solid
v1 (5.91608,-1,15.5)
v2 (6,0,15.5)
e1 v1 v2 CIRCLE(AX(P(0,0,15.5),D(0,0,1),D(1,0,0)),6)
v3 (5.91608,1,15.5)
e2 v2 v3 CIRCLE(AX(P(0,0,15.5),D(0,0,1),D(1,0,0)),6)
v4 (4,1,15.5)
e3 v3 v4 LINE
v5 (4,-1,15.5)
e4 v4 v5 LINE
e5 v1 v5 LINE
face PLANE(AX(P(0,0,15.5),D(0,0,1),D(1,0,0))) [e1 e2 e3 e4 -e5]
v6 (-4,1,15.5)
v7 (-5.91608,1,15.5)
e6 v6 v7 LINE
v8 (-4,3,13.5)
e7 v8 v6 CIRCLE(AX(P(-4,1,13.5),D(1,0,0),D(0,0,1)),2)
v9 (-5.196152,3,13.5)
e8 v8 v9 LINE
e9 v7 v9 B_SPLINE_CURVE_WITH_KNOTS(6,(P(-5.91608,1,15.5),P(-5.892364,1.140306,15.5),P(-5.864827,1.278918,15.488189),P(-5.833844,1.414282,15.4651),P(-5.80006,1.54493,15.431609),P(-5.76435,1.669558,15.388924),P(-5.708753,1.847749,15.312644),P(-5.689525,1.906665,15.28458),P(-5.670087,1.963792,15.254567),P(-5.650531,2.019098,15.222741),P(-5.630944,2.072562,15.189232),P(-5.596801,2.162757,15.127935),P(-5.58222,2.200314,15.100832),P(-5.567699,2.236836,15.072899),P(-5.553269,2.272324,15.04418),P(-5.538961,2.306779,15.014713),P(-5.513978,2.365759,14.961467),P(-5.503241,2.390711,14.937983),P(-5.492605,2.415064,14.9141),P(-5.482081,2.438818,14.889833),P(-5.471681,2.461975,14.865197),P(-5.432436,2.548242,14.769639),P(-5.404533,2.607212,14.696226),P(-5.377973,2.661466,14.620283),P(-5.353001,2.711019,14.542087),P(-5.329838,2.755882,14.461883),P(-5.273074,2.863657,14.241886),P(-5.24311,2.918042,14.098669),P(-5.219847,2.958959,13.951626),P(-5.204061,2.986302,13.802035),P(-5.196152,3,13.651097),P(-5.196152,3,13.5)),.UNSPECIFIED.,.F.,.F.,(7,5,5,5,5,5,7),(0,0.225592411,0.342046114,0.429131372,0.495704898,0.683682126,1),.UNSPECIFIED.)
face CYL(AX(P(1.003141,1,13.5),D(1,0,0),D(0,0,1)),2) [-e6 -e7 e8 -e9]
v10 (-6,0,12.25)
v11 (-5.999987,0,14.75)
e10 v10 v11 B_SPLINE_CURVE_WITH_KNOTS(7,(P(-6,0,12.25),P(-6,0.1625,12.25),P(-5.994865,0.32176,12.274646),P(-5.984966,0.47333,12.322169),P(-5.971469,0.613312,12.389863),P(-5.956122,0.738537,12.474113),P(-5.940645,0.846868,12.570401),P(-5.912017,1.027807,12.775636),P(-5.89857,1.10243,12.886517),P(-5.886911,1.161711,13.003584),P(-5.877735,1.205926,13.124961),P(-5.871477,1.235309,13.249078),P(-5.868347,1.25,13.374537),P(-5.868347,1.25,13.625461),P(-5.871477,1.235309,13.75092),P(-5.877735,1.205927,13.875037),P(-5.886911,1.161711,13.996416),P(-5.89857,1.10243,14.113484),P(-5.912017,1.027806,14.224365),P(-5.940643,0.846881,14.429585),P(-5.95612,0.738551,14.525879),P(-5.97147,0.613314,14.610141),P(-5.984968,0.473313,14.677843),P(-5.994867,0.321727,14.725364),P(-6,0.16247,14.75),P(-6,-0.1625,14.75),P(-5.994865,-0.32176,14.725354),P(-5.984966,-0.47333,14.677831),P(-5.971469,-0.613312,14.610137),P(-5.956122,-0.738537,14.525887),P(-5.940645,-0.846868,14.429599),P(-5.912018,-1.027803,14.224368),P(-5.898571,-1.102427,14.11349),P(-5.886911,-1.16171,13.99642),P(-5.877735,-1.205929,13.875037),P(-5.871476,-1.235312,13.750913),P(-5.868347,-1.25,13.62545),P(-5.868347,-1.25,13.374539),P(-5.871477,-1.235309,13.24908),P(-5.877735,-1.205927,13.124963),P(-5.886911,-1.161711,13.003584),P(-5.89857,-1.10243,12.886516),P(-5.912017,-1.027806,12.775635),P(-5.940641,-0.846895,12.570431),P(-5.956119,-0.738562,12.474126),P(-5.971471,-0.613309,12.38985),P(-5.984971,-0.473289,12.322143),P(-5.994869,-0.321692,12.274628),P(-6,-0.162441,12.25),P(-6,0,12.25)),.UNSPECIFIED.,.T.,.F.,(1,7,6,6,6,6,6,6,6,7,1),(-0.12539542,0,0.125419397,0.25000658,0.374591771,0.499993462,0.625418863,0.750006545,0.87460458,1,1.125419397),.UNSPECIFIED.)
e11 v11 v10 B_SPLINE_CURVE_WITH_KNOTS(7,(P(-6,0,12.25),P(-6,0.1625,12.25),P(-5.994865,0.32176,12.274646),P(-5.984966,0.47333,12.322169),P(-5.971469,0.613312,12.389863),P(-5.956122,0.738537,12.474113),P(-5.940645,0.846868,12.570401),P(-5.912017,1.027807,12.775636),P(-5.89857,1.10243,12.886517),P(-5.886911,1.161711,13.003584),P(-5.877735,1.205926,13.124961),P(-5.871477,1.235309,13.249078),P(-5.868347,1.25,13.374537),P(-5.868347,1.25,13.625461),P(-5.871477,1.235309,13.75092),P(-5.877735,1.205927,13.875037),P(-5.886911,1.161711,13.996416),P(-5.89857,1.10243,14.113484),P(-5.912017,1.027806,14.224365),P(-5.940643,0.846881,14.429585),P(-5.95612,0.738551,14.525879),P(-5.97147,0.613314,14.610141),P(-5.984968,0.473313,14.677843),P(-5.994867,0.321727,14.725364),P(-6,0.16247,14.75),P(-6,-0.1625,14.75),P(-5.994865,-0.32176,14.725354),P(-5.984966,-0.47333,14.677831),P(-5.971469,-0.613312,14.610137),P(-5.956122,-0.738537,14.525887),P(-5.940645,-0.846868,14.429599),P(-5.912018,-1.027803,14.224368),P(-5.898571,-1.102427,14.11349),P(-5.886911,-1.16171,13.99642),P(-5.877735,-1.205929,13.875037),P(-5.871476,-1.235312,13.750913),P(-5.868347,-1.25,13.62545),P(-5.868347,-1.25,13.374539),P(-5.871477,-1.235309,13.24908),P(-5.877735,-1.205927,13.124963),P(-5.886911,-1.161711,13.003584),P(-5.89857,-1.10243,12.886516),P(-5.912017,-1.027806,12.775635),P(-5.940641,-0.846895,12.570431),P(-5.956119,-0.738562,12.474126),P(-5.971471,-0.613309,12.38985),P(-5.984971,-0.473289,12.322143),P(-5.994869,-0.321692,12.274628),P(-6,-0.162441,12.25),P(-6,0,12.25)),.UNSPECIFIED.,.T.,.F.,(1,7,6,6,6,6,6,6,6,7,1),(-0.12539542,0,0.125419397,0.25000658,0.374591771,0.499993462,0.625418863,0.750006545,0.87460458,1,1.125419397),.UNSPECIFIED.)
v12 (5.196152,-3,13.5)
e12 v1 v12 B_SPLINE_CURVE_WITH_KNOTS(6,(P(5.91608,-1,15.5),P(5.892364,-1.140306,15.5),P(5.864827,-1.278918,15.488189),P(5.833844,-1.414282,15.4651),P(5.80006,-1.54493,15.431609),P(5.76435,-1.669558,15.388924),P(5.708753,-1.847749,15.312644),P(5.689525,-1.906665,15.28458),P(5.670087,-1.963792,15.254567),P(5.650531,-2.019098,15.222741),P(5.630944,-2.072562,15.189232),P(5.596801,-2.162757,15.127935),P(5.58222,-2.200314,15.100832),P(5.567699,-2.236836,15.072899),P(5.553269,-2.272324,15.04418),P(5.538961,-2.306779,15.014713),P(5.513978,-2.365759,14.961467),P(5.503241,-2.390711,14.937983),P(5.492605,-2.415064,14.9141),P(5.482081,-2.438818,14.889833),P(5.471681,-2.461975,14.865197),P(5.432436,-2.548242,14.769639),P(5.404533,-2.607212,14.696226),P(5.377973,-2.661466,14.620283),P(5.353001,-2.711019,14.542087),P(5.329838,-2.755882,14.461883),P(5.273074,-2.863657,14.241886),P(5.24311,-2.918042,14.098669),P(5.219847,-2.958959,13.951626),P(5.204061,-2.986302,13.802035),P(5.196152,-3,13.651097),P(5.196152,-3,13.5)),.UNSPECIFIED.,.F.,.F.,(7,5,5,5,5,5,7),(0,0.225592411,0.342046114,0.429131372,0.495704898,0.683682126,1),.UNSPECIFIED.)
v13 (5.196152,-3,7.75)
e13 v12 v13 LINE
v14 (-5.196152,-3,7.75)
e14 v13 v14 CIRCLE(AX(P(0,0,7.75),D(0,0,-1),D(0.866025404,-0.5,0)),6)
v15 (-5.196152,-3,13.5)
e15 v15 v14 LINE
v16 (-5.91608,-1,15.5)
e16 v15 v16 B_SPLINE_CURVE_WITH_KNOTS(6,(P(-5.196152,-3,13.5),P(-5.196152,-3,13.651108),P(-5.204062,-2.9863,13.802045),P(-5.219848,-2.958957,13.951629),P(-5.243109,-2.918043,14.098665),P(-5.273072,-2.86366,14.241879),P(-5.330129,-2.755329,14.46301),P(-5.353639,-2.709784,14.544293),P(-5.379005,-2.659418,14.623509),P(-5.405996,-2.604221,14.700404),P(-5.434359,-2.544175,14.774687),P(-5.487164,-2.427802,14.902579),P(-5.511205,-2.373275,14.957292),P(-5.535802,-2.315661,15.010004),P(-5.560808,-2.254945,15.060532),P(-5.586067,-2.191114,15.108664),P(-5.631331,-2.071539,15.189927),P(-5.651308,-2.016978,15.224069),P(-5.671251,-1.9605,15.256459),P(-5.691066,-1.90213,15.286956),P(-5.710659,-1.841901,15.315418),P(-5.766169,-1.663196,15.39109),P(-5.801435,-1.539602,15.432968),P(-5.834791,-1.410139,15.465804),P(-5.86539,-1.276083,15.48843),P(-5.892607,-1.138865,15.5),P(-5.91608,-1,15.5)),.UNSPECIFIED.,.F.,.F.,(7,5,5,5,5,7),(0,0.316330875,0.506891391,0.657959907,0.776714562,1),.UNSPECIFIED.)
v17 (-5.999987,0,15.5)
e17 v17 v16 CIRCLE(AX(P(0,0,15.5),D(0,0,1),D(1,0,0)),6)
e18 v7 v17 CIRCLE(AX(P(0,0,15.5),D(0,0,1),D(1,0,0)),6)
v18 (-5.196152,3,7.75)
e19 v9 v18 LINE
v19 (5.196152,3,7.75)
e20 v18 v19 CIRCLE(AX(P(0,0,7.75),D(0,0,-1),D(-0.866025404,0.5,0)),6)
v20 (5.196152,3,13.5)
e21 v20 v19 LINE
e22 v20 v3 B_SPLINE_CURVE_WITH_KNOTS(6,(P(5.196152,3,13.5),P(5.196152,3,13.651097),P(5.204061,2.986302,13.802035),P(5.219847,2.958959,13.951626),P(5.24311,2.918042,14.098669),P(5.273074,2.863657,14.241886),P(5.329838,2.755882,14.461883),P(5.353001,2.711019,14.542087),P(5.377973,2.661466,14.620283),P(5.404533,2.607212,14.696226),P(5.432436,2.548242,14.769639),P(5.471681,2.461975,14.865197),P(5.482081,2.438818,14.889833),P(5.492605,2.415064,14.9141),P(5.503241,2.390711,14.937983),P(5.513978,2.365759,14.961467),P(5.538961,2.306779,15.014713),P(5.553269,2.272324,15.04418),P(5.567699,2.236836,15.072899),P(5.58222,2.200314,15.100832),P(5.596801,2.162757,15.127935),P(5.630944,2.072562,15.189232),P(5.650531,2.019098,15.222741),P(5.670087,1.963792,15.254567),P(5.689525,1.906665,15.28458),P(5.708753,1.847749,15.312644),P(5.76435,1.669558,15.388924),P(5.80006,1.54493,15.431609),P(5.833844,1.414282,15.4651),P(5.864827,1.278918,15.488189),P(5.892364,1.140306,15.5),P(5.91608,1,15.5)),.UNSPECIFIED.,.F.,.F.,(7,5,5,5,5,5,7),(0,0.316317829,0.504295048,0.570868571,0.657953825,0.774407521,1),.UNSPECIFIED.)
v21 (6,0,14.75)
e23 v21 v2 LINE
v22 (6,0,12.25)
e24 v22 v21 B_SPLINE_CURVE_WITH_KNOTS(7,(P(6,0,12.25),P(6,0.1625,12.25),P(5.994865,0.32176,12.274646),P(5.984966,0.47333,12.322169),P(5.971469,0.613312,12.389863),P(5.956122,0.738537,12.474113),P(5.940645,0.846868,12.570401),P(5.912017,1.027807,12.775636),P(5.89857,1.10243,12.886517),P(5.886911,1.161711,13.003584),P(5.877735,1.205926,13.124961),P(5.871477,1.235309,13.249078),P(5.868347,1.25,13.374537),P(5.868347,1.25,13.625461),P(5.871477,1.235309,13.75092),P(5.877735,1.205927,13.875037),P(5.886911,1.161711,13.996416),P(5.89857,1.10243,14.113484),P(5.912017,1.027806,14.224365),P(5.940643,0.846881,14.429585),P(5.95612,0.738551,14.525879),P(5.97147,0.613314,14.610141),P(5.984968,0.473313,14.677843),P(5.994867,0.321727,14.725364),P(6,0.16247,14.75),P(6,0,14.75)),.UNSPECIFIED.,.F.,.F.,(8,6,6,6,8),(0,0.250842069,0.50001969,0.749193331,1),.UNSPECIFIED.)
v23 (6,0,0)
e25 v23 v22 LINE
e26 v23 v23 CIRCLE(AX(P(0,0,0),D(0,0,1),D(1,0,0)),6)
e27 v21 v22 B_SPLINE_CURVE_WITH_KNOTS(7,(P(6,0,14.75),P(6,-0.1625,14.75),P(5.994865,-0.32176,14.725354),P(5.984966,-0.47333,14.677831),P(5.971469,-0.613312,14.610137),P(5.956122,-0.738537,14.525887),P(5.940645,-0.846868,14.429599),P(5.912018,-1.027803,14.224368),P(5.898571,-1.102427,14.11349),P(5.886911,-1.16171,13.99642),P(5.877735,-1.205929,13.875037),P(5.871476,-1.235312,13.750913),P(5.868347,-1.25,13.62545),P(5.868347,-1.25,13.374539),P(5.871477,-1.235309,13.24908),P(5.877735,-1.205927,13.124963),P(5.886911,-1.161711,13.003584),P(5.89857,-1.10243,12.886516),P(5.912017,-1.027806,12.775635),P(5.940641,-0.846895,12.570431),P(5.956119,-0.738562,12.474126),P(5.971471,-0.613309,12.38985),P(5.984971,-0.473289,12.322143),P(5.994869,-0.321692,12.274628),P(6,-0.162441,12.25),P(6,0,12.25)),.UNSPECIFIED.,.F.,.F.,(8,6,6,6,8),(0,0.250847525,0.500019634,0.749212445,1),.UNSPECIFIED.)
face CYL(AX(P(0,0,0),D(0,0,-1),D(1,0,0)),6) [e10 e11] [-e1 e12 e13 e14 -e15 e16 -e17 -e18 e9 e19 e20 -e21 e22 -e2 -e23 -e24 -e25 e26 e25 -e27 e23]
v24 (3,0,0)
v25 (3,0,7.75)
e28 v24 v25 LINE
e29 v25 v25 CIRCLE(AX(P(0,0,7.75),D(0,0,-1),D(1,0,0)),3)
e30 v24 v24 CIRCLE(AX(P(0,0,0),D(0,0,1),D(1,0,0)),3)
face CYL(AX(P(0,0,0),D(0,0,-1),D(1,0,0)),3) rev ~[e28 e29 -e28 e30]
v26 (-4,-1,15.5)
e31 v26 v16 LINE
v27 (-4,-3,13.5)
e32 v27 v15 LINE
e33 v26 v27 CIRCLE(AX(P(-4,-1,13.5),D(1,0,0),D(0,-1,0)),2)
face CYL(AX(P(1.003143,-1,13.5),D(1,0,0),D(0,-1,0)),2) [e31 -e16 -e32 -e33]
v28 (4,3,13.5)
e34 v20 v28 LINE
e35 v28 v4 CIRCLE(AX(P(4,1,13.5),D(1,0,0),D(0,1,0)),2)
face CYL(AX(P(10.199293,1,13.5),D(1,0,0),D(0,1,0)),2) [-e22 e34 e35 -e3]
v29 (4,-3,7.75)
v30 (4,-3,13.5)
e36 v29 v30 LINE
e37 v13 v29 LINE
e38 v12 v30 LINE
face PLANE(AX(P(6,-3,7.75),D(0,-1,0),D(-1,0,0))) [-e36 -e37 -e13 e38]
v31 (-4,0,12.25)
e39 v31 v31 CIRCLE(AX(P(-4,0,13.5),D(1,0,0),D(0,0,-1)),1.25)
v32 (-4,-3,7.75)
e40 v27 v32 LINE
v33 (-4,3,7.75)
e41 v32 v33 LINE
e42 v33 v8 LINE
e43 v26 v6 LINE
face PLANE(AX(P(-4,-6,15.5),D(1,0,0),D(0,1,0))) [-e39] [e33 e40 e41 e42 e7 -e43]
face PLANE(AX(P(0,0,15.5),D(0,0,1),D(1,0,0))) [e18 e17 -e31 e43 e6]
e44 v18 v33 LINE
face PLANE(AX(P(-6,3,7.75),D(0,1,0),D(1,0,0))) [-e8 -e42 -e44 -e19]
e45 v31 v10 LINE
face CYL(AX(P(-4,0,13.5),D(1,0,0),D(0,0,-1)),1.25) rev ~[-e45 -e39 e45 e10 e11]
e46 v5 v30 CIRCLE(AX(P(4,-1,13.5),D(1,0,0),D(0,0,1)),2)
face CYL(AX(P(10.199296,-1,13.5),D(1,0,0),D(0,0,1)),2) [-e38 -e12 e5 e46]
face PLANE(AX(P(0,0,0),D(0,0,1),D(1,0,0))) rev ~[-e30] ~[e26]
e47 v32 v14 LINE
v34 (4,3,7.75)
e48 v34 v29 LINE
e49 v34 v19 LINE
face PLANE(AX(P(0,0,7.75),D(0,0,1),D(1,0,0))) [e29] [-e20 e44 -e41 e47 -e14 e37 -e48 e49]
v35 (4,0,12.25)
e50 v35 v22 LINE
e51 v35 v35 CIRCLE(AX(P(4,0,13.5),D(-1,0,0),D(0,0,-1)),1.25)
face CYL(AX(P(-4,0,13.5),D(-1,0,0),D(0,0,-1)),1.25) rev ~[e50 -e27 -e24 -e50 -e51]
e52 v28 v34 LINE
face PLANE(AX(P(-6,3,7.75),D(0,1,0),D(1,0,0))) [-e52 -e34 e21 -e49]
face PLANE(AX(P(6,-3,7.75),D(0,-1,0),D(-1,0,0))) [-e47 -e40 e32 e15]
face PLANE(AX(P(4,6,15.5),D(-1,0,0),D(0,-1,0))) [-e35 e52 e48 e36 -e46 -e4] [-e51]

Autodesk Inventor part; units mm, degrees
ref_plane "YZ Plane" through (0, 0, 0) normal (1, 0, 0) x (0, 1, 0)
ref_plane "XZ Plane" through (0, 0, 0) normal (0, 1, 0) x (-1, 0, 0)
ref_plane "XY Plane" through (0, 0, 0) normal (0, 0, 1) x (1, 0, 0)
sketch "Sketch1" plane through (0, 0, 0) normal (0, 0, 1) x (1, 0, 0)
  circle A0 centre (0, 0) radius 6
  circle A1 centre (0, 0) radius 3
  dimension "d0" = 12
  dimension "d1" = 6
extrude "Extrusion1" add sketch "Sketch1" along normal blind 15.5
sketch "Sketch2" plane through (0, 0, 15.5) normal (0, 0, 1) x (1, 0, 0)
  line L0 (-4, 6) -> (4, 6)
  line L1 (4, 6) -> (4, -6)
  line L2 (4, -6) -> (-4, -6)
  line L3 (-4, -6) -> (-4, 6)
  circle A0 centre (0, 0) radius 6 construction
  point P0 (0, 6)
  point P1 (4, 0)
  point P2 (0, -6)
  dimension "d4" = 8
extrude "Extrusion2" cut sketch "Sketch2" against normal blind 7.75
sketch "Sketch3" plane through (-4, -4.4721, 15.5) normal (1, 0, 0) x (0, 0, -1)
  arc A0 (2, 8.9443) -> (0, 6.9443) centre (2, 6.9443) ccw
  line L0 (0, 0) -> (7.75, 0) projected
  line L1 (7.75, 0) -> (7.75, 0) projected
  line L2 (7.75, 0) -> (0, 0) projected
  line L3 (0, 8.9443) -> (0, 0) projected
  line L4 (0, 8.9443) -> (7.75, 8.9443) projected
  line L5 (7.75, 8.9443) -> (7.75, 8.9443) projected
  line L6 (7.75, 8.9443) -> (0, 8.9443) projected
  line L7 (0, 0) -> (0, 8.9443) projected
  line L8 (15.5, -1.5279) -> (15.5, 10.4721) projected
  line L9 (0, 8.9443) -> (0, 0) projected
  arc A1 (0, 2) -> (2, 0) centre (2, 2) ccw
  line L10 (0, 2) -> (0, 0)
  line L11 (2, 0) -> (0, 0)
  line L12 (0, 6.9443) -> (0, 8.9443)
  line L13 (2, 8.9443) -> (0, 8.9443)
  point P0 (15.5, 4.4721)
  dimension "d7" = 2
  dimension "d8" = 2
extrude "Extrusion3" cut sketch "Sketch3" along normal through all both and the other way through all
sketch "Sketch4" plane through (-4, -4.4721, 7.75) normal (1, 0, 0) x (0, 0, -1)
  circle A0 centre (-5.75, 4.4721) radius 1.25
  line L0 (-7.75, 6.9443) -> (-7.75, 2) projected
  point P0 (7.75, 4.4721)
  point P1 (-7.75, 4.4721)
  dimension "d11" = 2.5
  dimension "d12" = 2
extrude "Extrusion4" cut sketch "Sketch4" along normal through all both and the other way through all
sketch "Sketch5" plane through (0, 0, 7.75) normal (0, 0, 1) x (1, 0, 0)
  line L0 (-6, 3) -> (6, 3)
  line L1 (6, 3) -> (6, -3)
  line L2 (6, -3) -> (-6, -3)
  line L3 (-6, -3) -> (-6, 3)
  arc A0 (-5.467, 2.4721) -> (-5.467, -2.4721) centre (0, 0) ccw projected
  arc A1 (5.467, -2.4721) -> (5.467, 2.4721) centre (0, 0) ccw projected
  line L4 (-12.5137, 9.699) -> (15.0071, 9.699)
  line L5 (15.0071, 9.699) -> (15.0071, -9.2746)
  line L6 (15.0071, -9.2746) -> (-12.5137, -9.2746)
  line L7 (-12.5137, -9.2746) -> (-12.5137, 9.699)
  point P0 (0, 3)
  point P1 (-6, 0)
  dimension "d15" = 6
extrude "Extrusion5" cut sketch "Sketch5" along normal through all
fillet "Fillet1" radius 2 4 edges at (-4.5981, 3, 15.4291) (-4.5981, -3, 15.4291) (4.5981, 3, 15.4291) (4.5981, -3, 15.4291)
properties part number "P1" material "Steel"
